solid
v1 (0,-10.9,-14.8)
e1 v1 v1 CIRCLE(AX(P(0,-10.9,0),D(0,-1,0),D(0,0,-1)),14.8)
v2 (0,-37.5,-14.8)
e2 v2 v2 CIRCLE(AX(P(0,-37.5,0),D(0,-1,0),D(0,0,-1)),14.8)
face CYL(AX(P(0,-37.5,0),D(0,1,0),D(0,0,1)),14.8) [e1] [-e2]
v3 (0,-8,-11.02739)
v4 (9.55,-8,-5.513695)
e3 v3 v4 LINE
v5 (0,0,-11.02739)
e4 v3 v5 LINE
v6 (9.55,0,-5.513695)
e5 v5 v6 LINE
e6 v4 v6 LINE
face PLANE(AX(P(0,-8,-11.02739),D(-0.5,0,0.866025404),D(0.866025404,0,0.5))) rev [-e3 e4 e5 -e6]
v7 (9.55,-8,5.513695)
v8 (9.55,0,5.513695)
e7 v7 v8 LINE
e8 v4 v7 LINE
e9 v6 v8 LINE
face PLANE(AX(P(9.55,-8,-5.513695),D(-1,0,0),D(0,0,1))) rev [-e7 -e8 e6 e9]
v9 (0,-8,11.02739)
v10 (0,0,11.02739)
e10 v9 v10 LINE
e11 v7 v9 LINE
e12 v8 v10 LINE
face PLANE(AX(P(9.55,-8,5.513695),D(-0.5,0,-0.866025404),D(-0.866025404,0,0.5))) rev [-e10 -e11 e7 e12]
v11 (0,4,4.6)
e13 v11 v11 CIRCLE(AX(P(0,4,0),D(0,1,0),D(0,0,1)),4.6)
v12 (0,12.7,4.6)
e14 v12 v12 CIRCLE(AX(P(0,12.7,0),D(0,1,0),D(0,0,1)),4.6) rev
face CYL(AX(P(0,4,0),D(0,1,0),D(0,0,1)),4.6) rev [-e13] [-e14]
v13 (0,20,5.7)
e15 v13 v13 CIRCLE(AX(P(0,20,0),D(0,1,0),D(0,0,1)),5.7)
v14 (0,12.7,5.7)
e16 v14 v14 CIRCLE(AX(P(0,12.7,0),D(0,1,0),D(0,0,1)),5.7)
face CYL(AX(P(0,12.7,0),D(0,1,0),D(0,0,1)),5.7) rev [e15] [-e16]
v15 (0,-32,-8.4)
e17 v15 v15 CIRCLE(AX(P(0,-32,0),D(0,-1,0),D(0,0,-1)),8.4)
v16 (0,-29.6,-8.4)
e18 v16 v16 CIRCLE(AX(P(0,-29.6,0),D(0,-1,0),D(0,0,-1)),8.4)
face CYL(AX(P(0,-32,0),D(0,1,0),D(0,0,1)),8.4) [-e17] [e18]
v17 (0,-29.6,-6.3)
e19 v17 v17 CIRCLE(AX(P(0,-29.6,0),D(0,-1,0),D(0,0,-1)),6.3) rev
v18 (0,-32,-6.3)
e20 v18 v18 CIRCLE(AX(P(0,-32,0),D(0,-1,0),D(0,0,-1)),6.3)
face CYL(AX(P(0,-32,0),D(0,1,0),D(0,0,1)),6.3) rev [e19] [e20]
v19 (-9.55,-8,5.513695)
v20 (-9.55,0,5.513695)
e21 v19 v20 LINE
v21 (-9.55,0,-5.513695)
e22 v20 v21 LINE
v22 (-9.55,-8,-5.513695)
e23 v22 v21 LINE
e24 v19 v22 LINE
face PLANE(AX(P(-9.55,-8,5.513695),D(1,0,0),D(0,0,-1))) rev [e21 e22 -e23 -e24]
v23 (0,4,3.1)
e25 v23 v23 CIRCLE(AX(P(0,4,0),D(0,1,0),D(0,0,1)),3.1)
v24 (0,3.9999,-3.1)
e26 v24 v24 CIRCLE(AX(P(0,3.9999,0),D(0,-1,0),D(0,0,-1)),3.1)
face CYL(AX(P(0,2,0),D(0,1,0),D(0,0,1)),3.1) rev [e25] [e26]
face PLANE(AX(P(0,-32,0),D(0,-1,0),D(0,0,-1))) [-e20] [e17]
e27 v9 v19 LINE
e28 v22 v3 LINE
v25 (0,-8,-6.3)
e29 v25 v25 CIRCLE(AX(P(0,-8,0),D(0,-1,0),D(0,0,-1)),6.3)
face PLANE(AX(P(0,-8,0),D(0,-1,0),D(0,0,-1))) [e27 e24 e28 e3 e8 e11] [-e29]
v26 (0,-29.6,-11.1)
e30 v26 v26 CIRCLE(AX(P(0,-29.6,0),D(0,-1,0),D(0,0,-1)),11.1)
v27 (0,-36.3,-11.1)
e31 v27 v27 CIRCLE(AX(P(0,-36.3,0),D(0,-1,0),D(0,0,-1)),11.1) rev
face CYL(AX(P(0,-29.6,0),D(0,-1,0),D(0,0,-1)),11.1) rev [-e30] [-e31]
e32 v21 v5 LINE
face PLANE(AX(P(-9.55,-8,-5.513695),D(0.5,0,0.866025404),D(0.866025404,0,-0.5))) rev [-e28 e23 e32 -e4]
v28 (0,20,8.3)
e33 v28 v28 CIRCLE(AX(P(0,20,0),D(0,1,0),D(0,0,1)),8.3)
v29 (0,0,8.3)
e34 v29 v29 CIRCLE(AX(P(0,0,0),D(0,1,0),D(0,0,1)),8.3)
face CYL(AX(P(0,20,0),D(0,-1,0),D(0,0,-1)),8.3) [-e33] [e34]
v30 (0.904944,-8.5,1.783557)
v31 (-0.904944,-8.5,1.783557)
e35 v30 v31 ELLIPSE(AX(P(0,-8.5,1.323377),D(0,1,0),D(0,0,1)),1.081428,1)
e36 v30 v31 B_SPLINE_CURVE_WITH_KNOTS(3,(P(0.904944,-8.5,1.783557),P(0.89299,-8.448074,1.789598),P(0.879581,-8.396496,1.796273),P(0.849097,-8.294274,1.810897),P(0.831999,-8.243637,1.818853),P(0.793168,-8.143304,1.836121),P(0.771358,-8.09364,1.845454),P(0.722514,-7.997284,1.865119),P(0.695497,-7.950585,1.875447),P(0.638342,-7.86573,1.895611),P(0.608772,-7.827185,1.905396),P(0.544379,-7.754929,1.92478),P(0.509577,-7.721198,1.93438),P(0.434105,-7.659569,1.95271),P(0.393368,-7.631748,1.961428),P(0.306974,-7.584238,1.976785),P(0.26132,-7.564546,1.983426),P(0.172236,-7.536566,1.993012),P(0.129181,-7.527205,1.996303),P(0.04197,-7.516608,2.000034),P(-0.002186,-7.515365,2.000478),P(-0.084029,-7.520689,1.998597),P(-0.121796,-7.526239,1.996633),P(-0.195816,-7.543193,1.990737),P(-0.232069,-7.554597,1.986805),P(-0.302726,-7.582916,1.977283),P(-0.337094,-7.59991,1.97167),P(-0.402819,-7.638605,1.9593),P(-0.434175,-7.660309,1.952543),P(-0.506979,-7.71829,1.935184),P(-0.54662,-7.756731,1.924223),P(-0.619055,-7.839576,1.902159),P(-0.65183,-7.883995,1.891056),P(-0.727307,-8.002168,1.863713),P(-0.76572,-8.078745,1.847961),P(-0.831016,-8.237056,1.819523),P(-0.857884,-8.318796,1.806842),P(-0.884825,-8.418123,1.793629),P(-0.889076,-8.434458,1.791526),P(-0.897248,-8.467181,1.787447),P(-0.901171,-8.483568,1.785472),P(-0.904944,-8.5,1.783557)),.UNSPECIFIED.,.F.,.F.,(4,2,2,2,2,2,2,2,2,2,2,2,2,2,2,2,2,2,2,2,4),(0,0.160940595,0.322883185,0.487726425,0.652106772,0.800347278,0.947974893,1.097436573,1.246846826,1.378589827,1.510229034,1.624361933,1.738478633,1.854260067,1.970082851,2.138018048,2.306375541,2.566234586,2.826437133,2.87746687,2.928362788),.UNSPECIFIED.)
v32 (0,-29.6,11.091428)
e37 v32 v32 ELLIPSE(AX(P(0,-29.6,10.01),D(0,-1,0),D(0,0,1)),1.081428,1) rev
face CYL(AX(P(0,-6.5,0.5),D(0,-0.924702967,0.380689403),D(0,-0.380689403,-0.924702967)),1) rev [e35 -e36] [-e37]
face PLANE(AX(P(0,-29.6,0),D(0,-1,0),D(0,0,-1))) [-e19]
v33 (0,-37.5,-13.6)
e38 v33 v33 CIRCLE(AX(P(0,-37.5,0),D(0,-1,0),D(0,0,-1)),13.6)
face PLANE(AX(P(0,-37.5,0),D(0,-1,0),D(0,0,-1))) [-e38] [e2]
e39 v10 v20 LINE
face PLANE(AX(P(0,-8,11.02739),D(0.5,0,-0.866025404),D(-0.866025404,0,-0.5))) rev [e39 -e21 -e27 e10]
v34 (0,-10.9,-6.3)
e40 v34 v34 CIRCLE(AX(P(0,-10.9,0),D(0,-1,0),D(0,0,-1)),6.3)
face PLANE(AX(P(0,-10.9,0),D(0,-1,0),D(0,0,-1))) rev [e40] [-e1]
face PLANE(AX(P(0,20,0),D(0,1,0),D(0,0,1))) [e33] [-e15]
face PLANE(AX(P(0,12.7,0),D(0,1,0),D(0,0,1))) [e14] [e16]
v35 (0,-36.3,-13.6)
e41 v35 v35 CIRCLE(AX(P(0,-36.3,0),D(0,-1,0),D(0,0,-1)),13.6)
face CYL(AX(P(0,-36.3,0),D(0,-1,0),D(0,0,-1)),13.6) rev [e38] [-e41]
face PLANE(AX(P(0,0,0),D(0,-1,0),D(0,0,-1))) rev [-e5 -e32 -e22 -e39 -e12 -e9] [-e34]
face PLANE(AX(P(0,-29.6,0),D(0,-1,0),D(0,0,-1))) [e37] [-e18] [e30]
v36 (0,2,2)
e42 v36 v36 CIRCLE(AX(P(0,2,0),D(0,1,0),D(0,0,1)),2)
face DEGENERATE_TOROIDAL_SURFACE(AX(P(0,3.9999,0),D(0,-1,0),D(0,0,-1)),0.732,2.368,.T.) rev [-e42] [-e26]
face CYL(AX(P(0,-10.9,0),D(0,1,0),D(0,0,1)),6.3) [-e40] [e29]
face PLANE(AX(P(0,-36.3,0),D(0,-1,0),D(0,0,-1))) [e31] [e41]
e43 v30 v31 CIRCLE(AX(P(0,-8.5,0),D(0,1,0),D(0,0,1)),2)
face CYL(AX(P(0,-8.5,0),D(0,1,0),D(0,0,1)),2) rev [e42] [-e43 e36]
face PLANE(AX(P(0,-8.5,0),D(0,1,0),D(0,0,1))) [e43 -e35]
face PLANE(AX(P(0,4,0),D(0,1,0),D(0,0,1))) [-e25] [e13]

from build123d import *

# Parameters (mm, degrees)
SKETCH1_R            = 8.3
BOSS_EXTRUDE1_DEPTH  = 20
BOSS_EXTRUDE2_DEPTH  = 8
SKETCH3_R            = 4.6
CUT_EXTRUDE1_DEPTH   = 16
SKETCH4_R            = 5.7
CUT_EXTRUDE2_DEPTH   = 7.3
SKETCH5_R            = 3.1
CUT_EXTRUDE3_DEPTH   = 2
SKETCH7_R            = 6.3
BOSS_EXTRUDE3_DEPTH  = 2.9
SKETCH6_R            = 2
CUT_EXTRUDE4_DEPTH   = 10.5
FILLET1_R            = 2.368
SKETCH9_R            = 14.8
BOSS_EXTRUDE5_DEPTH  = 26.6
SKETCH10_R           = 11.1
CUT_EXTRUDE5_DEPTH   = 7.9
SKETCH11_R           = 13.6
CUT_EXTRUDE6_DEPTH   = 1.2
SKETCH12_R           = 8.4
SKETCH12_R_2         = 6.3
BOSS_EXTRUDE6_DEPTH  = 2.4
CUT_SWEEP2_START     = -31.593597178
CUT_SWEEP2_OUTLINE_R = 1
CUT_SWEEP2_DEPTH     = 24.495000761


with BuildPart() as part:
    # Sketch1 → Boss-Extrude1 (new body)
    with BuildSketch(Plane(origin=(0, 0, 0), x_dir=(1, 0, 0), z_dir=(0, 1, 0))):
        with Locations(Location((0, 0, 0), (0, 0, 270))):
            Circle(SKETCH1_R)
    extrude(amount=BOSS_EXTRUDE1_DEPTH)

    # Sketch2 → Boss-Extrude2 (add)
    with BuildSketch(Plane.XZ):
        Polygon((0, 11.027390142), (-9.55, 5.513695071), (-9.55, -5.513695071), (0, -11.027390142), (9.55, -5.513695071), (9.55, 5.513695071), align=None)
    extrude(amount=BOSS_EXTRUDE2_DEPTH)

    # Sketch3 → Cut-Extrude1 (cut)
    with BuildSketch(Plane(origin=(0, 20, 0), x_dir=(1, 0, 0), z_dir=(0, 1, 0))):
        with Locations(Location((0, 0, 0), (0, 0, 270))):
            Circle(SKETCH3_R)
    extrude(amount=-CUT_EXTRUDE1_DEPTH, mode=Mode.SUBTRACT)

    # Sketch4 → Cut-Extrude2 (cut)
    with BuildSketch(Plane(origin=(0, 20, 0), x_dir=(1, 0, 0), z_dir=(0, 1, 0))):
        with Locations(Location((0, 0, 0), (0, 0, 270))):
            Circle(SKETCH4_R)
    extrude(amount=-CUT_EXTRUDE2_DEPTH, mode=Mode.SUBTRACT)

    # Sketch5 → Cut-Extrude3 (cut)
    with BuildSketch(Plane(origin=(0, 4, 0), x_dir=(1, 0, 0), z_dir=(0, 1, 0))):
        with Locations(Location((0, 0, 0), (0, 0, 270))):
            Circle(SKETCH5_R)
    extrude(amount=-CUT_EXTRUDE3_DEPTH, mode=Mode.SUBTRACT)

    # Sketch7 → Boss-Extrude3 (add)
    with BuildSketch(Plane.XZ.offset(8)):
        with Locations(Location((0, 0, 0), (0, 0, 270))):
            Circle(SKETCH7_R)
    extrude(amount=BOSS_EXTRUDE3_DEPTH)

    # Sketch6 → Cut-Extrude4 (cut)
    with BuildSketch(Plane(origin=(0, 2, 0), x_dir=(1, 0, 0), z_dir=(0, 1, 0))):
        with Locations(Location((0, 0, 0), (0, 0, 270))):
            Circle(SKETCH6_R)
    extrude(amount=-CUT_EXTRUDE4_DEPTH, mode=Mode.SUBTRACT)

    # Fillet1
    # the kernel refuses this fillet: 2.368 mm, written as the material it adds along each edge
    with BuildSketch(Plane(origin=(0, 2, 0), x_dir=(0, 0, 1), z_dir=(-1, 0, 0))) as fillet1_piece_1:
        with BuildLine():
            CenterArc((0.732, 1.999899998), FILLET1_R, 302.375992961, 57.624007039)
            Line((2, 0), (3.1, 0))
            Line((3.1, 0), (3.1, 1.999899998))
        make_face()
    revolve(axis=Axis((0, 2, 0), (0, 1, 0)))

    # Sketch9 → Boss-Extrude5 (add)
    with BuildSketch(Plane.XZ.offset(10.9)):
        with Locations(Location((0, 0, 0), (0, 0, 270))):
            Circle(SKETCH9_R)
    extrude(amount=BOSS_EXTRUDE5_DEPTH)

    # Sketch10 → Cut-Extrude5 (cut)
    with BuildSketch(Plane.XZ.offset(37.5)):
        with Locations(Location((0, 0, 0), (0, 0, 270))):
            Circle(SKETCH10_R)
    extrude(amount=-CUT_EXTRUDE5_DEPTH, mode=Mode.SUBTRACT)

    # Sketch11 → Cut-Extrude6 (cut)
    with BuildSketch(Plane.XZ.offset(37.5)):
        with Locations(Location((0, 0, 0), (0, 0, 270))):
            Circle(SKETCH11_R)
    extrude(amount=-CUT_EXTRUDE6_DEPTH, mode=Mode.SUBTRACT)

    # Sketch12 → Boss-Extrude6 (add)
    with BuildSketch(Plane.XZ.offset(29.6)):
        with Locations(Location((0, 0, 0), (0, 0, 270))):
            Circle(SKETCH12_R)
        with Locations(Location((0, 0, 0), (0, 0, 270))):
            Circle(SKETCH12_R_2, mode=Mode.SUBTRACT)
    extrude(amount=BOSS_EXTRUDE6_DEPTH)

    # Cut-Sweep2: read off the stored shape, not the designer's step
    # Cut-Sweep2 outline → Cut-Sweep2 (cut)
    with BuildSketch(Plane(origin=(0, 0, 0), x_dir=(1, 0, 0), z_dir=(0, 0.9247029674801356, -0.38068940349506886)).offset(CUT_SWEEP2_START)):
        with Locations((0, 2.012129639)):
            Circle(CUT_SWEEP2_OUTLINE_R)
    extrude(amount=CUT_SWEEP2_DEPTH, mode=Mode.SUBTRACT)


solid = part.part
